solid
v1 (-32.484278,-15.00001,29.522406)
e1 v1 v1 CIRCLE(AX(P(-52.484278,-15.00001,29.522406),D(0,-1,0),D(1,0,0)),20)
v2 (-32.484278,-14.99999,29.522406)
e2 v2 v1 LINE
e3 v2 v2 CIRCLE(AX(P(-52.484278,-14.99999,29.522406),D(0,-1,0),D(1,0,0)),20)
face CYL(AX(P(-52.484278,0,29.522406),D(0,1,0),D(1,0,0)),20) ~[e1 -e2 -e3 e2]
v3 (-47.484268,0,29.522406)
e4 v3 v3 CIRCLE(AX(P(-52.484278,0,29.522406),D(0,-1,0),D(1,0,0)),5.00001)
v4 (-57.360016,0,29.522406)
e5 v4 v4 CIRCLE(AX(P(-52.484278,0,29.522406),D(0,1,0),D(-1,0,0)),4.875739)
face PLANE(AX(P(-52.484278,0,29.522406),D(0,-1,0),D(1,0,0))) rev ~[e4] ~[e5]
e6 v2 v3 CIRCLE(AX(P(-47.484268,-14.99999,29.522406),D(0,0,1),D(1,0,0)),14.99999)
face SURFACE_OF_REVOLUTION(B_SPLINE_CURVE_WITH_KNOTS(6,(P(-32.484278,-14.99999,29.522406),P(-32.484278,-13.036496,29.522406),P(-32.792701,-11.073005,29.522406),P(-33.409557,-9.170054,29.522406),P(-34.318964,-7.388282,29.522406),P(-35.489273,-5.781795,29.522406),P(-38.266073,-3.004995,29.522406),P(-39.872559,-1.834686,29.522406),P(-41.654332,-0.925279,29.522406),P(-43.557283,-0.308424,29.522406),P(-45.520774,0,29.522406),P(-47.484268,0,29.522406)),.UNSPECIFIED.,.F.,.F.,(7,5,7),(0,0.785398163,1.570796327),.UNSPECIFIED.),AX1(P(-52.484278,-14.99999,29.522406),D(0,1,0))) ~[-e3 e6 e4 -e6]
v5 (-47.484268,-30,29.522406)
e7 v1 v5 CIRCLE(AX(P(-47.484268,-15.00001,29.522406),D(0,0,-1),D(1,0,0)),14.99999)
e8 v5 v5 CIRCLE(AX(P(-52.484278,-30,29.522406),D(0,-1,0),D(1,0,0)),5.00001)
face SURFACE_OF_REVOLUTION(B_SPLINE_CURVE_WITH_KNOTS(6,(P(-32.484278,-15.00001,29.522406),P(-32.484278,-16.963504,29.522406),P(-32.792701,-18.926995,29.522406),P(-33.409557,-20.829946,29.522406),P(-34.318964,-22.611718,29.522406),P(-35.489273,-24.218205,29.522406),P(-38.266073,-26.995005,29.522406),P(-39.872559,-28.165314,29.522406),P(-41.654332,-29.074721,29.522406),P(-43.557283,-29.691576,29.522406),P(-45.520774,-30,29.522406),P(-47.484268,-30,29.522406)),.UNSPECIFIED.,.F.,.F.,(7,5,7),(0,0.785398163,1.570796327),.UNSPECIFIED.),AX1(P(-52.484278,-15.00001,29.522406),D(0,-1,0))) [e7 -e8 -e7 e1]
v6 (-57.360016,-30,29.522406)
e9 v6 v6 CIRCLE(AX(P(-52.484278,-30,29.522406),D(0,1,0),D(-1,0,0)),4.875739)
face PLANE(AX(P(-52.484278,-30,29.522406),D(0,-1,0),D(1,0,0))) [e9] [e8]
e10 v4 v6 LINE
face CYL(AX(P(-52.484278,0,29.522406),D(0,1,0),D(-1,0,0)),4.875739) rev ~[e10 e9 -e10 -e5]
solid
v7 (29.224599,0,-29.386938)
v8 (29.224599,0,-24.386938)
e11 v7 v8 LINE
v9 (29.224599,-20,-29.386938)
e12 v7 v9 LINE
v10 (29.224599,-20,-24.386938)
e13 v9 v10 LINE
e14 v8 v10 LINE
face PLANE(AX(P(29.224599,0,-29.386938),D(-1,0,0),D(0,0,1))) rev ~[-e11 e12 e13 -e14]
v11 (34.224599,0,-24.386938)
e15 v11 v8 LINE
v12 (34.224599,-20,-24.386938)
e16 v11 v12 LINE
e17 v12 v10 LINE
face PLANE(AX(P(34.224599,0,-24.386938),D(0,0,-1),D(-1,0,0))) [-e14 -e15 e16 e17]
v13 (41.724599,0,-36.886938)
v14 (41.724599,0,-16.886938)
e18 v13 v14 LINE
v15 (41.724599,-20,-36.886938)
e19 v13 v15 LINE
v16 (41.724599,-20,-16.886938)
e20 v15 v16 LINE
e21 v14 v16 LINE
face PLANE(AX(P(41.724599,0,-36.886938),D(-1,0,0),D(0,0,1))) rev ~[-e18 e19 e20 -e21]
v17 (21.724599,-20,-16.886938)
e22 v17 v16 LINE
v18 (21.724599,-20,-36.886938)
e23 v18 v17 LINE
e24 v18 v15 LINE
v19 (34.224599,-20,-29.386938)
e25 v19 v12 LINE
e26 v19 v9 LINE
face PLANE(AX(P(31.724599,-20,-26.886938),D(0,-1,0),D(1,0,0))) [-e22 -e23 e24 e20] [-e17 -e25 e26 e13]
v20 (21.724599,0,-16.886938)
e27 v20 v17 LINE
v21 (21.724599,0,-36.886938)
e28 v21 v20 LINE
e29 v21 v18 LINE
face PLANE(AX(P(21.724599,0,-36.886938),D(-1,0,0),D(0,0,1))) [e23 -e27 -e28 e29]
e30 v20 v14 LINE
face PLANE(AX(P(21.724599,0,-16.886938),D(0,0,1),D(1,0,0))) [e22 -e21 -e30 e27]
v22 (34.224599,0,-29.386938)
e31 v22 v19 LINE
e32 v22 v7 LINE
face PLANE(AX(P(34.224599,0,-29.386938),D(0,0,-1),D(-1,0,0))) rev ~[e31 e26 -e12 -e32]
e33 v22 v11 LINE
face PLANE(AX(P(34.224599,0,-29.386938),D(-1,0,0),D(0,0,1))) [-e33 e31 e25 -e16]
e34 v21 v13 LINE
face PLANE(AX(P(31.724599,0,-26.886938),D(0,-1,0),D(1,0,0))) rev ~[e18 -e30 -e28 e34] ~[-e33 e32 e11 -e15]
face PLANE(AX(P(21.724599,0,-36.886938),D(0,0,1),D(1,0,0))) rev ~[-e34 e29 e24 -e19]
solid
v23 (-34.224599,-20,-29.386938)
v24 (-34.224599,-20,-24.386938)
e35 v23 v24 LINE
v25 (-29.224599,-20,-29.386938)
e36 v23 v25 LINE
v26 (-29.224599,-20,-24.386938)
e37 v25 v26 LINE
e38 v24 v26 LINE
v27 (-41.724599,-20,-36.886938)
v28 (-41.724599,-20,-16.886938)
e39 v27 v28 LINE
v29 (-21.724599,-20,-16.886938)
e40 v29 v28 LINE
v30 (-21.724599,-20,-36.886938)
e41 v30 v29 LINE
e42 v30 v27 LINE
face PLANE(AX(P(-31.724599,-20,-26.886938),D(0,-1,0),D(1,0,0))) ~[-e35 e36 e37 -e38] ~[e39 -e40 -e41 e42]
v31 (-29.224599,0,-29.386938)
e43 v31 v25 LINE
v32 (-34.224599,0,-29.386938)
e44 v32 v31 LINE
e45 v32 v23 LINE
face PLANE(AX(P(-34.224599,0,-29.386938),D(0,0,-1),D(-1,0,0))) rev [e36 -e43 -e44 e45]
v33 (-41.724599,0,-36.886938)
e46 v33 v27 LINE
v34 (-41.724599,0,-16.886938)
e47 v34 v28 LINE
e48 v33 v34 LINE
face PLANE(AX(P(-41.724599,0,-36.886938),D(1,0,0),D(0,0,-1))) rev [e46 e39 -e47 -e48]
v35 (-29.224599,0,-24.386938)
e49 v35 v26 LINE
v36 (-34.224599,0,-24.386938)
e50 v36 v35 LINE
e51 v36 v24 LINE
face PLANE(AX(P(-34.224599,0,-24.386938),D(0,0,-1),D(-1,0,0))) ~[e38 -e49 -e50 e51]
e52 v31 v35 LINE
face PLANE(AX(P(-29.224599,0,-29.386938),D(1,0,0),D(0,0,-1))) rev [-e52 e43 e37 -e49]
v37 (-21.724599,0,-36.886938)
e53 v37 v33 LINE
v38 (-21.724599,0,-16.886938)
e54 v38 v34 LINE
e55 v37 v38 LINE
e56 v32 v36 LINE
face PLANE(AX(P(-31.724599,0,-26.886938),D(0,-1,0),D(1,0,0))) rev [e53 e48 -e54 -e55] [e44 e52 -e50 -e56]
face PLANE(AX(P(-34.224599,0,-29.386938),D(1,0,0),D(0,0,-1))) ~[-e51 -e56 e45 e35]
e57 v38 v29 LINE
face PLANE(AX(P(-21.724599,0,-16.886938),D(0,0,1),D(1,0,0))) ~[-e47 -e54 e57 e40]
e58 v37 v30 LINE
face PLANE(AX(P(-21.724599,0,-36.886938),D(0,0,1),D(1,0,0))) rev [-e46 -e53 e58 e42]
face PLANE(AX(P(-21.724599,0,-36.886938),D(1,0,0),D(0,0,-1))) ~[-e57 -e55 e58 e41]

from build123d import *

# Parameters (mm, degrees)
F0_R     = 20
F1_DEPTH = 30
F2_R     = 14.99999
F3_W     = 20
F3_H     = 20
F4_DEPTH = 20
F5_W     = 5
F5_H     = 5
F6_DEPTH = 20
F8_R     = 4.8757387147
F9_DEPTH = 30


# Not quite as in the source:
# - a fillet or chamfer is up to 0.001 mm smaller than in the source, because OpenCascade refuses the exact size


with BuildPart() as f1:
    # F0 (on Front) → F1 (new body)
    with BuildSketch(Plane.XZ):
        with Locations((-52.4842776358, 29.5224059373)):
            Circle(F0_R)
    extrude(amount=F1_DEPTH)

    # F2 (radius 15 in the source; OpenCascade refuses exactly that, so slightly less here)
    f2_edges = [f1.edges().sort_by_distance(p)[0] for p in [
        (-72.484278, -30, 29.522406),
        (-32.484278, -15, 29.522406),
        (-72.484278, 0, 29.522406),
    ]]
    fillet(f2_edges, radius=F2_R)

    # F8 (on face) → F9 (cut)
    with BuildSketch(Plane(origin=(0, 0, 0), x_dir=(-1, 0, 0), z_dir=(0, 1, 0))):
        with Locations((52.4842776358, 29.5224059373)):
            Circle(F8_R)
    extrude(amount=-F9_DEPTH, mode=Mode.SUBTRACT)


with BuildPart() as f4:
    # F3 (on Front) → F4 (new body)
    with BuildSketch(Plane.XZ):
        with Locations((31.7245987244, -26.886938234)):
            Rectangle(F3_W, F3_H)
    extrude(amount=F4_DEPTH)

    # F5 (on face) → F6 (cut)
    with BuildSketch(Plane(origin=(0, 0, 0), x_dir=(-1, 0, 0), z_dir=(0, 1, 0))):
        with Locations((-31.7245987244, -26.886938234)):
            Rectangle(F5_W, F5_H)
    extrude(amount=-F6_DEPTH, mode=Mode.SUBTRACT)


with BuildPart() as f7_1:
    # F7: instance of F4
    add(f4.part.mirror(Plane.YZ))


solid = Compound([f1.part, f4.part, f7_1.part])
